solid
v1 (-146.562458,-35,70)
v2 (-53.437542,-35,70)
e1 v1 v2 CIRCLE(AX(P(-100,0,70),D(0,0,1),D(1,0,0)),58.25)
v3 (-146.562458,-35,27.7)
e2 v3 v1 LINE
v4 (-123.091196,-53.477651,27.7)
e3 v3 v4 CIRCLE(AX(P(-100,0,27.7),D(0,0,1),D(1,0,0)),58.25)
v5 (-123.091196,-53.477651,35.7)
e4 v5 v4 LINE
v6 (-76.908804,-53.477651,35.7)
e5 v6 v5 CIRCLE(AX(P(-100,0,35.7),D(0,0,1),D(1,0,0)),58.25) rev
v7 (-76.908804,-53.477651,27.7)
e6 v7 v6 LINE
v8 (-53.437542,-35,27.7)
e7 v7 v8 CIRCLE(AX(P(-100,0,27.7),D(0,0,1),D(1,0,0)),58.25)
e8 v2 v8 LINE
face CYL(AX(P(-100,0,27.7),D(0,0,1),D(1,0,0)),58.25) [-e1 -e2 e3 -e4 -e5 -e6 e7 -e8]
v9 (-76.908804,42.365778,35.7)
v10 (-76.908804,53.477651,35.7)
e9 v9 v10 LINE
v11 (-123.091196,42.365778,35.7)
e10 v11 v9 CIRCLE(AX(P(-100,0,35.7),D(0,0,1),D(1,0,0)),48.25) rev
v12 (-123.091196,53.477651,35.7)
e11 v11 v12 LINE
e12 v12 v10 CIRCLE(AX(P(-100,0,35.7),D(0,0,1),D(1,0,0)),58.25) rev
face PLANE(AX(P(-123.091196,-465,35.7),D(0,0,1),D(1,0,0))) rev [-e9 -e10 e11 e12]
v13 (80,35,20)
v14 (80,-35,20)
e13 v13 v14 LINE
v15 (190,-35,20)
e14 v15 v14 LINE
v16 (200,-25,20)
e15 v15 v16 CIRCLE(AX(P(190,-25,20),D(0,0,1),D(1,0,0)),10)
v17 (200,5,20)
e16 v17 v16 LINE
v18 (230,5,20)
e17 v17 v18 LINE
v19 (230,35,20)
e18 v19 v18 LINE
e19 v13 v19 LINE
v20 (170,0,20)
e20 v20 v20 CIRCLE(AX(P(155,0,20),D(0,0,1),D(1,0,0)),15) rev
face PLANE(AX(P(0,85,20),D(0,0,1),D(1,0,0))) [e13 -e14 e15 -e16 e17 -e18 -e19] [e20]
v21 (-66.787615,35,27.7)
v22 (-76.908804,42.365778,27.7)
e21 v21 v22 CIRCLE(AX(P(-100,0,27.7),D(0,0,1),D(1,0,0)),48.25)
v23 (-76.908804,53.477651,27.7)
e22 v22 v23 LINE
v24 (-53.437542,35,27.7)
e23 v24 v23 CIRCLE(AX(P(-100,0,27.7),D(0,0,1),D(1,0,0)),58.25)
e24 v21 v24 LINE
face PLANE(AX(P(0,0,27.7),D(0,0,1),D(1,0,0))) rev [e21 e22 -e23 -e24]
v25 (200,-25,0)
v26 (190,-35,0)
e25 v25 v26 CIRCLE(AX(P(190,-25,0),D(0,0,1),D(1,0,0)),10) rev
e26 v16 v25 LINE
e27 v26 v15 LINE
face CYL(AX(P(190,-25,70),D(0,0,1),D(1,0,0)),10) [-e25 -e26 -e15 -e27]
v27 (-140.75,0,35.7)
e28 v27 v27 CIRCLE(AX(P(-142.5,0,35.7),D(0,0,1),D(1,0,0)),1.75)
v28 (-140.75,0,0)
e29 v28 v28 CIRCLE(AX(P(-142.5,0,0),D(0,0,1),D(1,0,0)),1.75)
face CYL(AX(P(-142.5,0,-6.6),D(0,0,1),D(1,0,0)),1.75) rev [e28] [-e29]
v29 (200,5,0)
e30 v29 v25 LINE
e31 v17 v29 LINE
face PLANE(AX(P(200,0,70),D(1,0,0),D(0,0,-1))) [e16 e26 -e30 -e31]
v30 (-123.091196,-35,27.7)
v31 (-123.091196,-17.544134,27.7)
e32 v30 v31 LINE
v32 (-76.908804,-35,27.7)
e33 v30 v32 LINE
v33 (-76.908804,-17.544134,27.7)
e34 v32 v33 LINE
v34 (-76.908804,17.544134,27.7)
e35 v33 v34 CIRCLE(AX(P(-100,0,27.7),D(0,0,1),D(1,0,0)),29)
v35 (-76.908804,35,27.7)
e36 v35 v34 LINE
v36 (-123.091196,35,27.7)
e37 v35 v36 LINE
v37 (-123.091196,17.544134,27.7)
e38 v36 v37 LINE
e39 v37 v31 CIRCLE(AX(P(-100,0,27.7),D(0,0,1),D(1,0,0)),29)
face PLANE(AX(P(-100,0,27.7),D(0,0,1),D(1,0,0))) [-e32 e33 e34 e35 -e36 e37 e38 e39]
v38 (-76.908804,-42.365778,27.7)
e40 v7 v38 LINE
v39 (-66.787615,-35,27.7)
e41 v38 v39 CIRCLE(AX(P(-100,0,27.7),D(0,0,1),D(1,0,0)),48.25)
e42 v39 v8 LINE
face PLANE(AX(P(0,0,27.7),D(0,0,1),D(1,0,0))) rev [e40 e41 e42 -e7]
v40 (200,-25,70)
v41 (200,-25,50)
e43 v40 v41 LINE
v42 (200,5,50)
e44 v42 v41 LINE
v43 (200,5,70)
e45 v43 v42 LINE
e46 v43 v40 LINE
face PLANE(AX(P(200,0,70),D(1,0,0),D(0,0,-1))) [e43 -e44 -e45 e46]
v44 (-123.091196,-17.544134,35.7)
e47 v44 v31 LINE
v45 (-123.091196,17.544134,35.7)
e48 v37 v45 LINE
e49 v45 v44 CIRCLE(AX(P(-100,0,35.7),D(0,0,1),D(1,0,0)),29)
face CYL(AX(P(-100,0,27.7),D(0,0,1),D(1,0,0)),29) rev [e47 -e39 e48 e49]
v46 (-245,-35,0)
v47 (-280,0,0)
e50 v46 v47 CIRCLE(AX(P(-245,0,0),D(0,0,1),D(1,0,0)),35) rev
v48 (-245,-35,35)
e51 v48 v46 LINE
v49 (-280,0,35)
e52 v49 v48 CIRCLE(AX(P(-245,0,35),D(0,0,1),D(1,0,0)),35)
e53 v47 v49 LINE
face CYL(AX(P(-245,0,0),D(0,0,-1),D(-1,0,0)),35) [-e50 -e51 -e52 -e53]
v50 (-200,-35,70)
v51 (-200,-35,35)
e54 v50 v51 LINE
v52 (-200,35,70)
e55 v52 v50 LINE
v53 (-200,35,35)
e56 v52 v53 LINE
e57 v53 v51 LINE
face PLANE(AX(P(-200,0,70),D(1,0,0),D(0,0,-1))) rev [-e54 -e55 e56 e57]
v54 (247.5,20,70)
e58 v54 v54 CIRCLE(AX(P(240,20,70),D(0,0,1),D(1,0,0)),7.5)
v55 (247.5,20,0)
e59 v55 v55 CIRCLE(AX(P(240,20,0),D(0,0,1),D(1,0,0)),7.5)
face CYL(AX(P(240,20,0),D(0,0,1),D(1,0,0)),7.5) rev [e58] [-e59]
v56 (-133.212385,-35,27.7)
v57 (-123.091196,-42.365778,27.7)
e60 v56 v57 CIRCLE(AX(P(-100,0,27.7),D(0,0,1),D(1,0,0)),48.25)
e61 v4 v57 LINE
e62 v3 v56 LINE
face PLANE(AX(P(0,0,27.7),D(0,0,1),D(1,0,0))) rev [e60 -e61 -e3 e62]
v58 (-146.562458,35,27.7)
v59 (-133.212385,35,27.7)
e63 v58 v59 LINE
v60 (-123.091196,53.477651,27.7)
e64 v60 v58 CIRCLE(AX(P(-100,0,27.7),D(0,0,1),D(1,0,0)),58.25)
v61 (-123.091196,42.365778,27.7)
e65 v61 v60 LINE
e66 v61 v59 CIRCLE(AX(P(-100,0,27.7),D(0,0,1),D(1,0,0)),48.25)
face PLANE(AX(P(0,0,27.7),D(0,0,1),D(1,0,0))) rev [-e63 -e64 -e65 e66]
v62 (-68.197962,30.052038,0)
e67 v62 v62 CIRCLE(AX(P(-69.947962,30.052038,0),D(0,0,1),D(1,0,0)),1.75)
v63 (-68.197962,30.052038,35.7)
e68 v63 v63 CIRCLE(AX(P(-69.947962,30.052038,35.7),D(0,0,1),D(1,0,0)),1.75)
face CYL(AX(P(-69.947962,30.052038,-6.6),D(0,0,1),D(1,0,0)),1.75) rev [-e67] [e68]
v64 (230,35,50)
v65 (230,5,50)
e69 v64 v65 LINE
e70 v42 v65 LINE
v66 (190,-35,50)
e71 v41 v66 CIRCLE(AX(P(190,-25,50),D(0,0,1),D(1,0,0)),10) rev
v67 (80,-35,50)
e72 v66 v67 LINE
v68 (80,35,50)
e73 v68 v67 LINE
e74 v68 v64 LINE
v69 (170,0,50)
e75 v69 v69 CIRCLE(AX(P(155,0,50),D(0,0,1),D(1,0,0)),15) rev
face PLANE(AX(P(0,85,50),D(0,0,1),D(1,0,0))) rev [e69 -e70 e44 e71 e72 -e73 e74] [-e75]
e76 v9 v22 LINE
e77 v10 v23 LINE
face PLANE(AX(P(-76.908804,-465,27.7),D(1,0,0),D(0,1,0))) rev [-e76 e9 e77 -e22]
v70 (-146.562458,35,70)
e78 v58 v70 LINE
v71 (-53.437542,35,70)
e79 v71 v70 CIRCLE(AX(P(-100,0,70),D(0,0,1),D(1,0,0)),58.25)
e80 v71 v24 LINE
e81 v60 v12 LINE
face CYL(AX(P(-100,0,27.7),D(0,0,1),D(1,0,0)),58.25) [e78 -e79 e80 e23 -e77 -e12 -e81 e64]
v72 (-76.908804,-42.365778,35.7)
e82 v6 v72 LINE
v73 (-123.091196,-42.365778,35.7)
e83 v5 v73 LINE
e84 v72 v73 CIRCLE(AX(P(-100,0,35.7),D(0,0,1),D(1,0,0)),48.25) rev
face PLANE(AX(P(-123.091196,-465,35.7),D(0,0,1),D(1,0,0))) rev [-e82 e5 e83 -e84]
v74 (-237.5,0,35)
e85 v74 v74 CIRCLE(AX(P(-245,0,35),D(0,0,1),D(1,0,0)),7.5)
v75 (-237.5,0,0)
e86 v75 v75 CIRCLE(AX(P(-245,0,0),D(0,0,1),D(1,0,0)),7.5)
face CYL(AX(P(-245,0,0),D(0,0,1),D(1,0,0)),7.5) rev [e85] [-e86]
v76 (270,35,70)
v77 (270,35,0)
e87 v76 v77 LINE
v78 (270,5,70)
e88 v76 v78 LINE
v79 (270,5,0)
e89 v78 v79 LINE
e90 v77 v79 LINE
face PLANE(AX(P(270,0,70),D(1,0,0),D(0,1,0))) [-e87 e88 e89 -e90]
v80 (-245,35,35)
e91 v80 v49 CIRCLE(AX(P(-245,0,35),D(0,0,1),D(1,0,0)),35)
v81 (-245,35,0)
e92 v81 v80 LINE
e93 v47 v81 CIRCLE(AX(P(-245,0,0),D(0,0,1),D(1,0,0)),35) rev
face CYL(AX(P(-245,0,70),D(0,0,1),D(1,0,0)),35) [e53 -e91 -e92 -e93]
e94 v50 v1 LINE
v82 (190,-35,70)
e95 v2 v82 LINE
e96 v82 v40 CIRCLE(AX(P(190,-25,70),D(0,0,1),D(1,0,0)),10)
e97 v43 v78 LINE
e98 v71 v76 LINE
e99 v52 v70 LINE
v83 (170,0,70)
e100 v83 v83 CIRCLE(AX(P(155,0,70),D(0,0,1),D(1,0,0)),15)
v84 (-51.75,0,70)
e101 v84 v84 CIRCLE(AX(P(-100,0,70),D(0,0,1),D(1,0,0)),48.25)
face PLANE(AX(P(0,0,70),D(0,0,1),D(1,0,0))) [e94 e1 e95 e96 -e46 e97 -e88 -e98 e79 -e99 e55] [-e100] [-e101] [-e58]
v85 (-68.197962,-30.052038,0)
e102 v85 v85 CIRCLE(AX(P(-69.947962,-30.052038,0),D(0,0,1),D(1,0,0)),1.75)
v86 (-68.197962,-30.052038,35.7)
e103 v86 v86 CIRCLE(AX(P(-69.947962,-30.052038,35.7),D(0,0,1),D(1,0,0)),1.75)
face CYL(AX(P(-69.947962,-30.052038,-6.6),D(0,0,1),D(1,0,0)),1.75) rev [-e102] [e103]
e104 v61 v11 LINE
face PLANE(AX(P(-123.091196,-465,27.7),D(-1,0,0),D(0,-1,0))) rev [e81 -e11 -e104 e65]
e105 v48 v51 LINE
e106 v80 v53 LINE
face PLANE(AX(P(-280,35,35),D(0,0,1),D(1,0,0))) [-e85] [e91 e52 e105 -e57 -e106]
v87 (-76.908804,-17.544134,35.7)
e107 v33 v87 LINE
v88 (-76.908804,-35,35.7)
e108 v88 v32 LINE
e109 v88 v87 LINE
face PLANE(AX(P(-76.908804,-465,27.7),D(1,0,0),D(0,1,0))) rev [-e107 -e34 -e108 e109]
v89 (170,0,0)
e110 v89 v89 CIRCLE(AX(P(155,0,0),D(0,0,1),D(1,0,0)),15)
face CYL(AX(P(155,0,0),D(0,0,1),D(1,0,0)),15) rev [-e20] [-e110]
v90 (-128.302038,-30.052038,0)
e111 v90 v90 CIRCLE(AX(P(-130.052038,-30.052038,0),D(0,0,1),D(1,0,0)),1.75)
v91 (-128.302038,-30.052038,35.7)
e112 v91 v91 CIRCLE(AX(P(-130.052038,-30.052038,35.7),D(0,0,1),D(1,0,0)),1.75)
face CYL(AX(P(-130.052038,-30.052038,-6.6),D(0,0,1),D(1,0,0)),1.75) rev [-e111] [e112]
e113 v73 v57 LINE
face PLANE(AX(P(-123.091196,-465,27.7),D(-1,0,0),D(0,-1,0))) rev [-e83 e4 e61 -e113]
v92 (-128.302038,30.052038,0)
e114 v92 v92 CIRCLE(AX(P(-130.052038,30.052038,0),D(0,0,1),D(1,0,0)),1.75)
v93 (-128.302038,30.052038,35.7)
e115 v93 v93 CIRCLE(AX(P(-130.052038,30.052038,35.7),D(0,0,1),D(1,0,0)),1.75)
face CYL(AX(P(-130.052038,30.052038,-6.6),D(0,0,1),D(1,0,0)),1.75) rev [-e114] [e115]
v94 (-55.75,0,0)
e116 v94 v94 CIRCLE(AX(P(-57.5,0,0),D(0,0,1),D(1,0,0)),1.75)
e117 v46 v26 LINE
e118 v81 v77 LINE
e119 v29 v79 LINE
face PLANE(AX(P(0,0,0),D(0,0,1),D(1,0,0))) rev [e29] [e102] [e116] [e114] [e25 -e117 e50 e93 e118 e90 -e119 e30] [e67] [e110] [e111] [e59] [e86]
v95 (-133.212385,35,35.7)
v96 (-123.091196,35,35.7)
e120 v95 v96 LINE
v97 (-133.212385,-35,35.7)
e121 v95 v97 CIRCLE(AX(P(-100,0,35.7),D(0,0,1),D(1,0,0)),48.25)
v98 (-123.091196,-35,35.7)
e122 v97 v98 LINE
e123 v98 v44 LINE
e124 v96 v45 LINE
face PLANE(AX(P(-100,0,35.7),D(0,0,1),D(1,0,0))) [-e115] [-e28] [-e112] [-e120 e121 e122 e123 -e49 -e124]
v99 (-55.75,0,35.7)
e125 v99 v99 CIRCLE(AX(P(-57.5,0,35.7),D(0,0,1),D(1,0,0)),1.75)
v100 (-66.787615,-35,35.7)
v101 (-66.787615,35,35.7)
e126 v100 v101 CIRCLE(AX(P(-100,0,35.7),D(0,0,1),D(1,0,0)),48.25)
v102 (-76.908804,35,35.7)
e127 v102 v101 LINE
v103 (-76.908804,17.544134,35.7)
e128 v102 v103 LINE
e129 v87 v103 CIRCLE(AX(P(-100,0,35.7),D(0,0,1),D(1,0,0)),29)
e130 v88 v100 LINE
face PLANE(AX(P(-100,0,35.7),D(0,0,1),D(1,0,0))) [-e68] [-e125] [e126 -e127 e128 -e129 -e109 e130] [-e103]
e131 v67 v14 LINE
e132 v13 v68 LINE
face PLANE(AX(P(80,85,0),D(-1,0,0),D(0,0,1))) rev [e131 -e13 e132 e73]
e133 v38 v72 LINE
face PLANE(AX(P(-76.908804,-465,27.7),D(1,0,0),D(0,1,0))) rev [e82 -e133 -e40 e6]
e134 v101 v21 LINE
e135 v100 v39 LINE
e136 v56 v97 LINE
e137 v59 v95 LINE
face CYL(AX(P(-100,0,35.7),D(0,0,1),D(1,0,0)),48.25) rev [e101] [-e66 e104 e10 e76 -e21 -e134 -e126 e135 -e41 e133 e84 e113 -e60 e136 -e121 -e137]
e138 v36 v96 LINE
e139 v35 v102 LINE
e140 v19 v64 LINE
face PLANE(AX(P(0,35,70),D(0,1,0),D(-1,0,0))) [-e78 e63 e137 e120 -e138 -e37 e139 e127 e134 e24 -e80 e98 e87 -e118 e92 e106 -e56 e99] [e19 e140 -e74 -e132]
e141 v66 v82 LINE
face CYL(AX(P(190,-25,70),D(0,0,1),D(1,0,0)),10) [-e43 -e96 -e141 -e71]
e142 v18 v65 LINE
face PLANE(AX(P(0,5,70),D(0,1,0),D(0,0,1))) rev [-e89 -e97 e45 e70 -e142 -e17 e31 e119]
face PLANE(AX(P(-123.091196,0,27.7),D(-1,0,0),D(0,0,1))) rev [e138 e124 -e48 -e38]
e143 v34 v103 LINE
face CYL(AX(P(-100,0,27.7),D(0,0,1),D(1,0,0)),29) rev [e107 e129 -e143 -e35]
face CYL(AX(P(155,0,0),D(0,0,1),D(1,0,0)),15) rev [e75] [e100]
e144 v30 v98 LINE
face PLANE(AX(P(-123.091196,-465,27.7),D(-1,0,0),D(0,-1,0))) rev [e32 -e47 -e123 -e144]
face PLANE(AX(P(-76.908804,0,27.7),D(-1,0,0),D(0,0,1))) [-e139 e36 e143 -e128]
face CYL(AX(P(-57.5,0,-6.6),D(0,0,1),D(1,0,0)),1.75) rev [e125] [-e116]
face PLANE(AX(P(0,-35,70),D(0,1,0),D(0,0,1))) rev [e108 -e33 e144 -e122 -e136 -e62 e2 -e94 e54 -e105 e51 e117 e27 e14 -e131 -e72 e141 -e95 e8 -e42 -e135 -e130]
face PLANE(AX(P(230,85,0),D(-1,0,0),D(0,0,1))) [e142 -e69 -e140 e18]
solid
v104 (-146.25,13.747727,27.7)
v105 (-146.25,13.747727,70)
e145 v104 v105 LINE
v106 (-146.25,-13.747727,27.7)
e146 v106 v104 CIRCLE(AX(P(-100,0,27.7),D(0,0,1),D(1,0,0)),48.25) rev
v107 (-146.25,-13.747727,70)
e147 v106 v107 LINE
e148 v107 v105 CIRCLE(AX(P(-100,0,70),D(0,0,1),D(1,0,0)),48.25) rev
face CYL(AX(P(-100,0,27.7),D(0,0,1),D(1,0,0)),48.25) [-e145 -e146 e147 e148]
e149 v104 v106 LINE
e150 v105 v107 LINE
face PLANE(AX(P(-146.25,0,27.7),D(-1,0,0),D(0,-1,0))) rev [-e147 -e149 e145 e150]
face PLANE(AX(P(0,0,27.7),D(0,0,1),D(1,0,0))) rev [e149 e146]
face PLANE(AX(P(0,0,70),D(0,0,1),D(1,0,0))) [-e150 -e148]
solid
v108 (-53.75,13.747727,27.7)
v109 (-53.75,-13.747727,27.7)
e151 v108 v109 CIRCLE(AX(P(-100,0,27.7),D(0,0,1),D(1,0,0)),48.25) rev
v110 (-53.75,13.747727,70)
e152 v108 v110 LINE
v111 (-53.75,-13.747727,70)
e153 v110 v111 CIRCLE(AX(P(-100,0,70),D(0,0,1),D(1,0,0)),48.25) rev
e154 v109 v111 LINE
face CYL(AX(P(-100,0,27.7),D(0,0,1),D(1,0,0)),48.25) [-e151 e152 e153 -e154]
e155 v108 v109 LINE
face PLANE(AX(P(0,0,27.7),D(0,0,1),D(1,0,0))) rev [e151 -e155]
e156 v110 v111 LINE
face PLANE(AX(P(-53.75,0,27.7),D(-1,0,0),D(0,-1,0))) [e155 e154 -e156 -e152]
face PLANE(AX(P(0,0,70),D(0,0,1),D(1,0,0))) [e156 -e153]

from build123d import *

# Parameters (mm, degrees)
SKETCH_2_W           = 400
SKETCH_2_H           = 70
SKETCH_2_W_2         = 70
SKETCH_2_H_2         = 30
EXTRUDE_2_DEPTH      = 70
SKETCH_3_R           = 7.5
SKETCH_3_R_2         = 15
CUT_EXTRUDE_1_DEPTH  = 282.113855937
SKETCH_4_W           = 120
SKETCH_4_H           = 30
SKETCH_4_W_2         = 30
CUT_EXTRUDE_2_DEPTH  = 120
FILLET_1_R           = 10
SKETCH_5_R           = 48.25
CUT_EXTRUDE_3_DEPTH  = 34.3
EXTRUDE_3_DEPTH      = 42.3
EXTRUDE_4_DEPTH      = 42.3
EXTRUDE_4_2_DEPTH    = 42.3
SKETCH_8_R           = 1.75
CUT_EXTRUDE_4_DEPTH  = 42.3
SKETCH_11_R          = 29
CUT_EXTRUDE_6_DEPTH  = 8
CUT_EXTRUDE_7_DEPTH  = 8
SKETCH_13_W          = 35
SKETCH_13_H          = 70
EXTRUDE_5_DEPTH      = 80
FILLET_2_R           = 35
SKETCH_14_R          = 7.5
CUT_EXTRUDE_8_DEPTH  = 295.436856558
SKETCH_15_W          = 46.18239298
SKETCH_15_H          = 8
CUT_EXTRUDE_10_DEPTH = 500


with BuildPart() as part:
    # 草图2 → 凸台-拉伸2 (new body)
    with BuildSketch(Plane.XY):
        Rectangle(SKETCH_2_W, SKETCH_2_H)
        with Locations((235, 20)):
            Rectangle(SKETCH_2_W_2, SKETCH_2_H_2)
    extrude(amount=EXTRUDE_2_DEPTH)

    # 草图3 → 切除-拉伸1 (cut, through all)
    with BuildSketch(Plane.XY.offset(70)):
        with Locations((240, 20)):
            Circle(SKETCH_3_R)
        with Locations((155, 0)):
            Circle(SKETCH_3_R_2)
    extrude(amount=-CUT_EXTRUDE_1_DEPTH, mode=Mode.SUBTRACT)

    # 草图4 → 切除-拉伸2 (cut)
    with BuildSketch(Plane.XZ.offset(35)):
        with Locations((140, 35)):
            Rectangle(SKETCH_4_W, SKETCH_4_H)
        with Locations((215, 35)):
            Rectangle(SKETCH_4_W_2, SKETCH_4_H)
    extrude(amount=-CUT_EXTRUDE_2_DEPTH, mode=Mode.SUBTRACT)

    # 圆角1
    fillet_1_edges = [part.edges().sort_by_distance(p)[0] for p in [
        (200, -35, 60),
        (200, -35, 10),
    ]]
    fillet(fillet_1_edges, radius=FILLET_1_R)

    # 草图5 → 切除-拉伸3 (cut)
    with BuildSketch(Plane.XY.offset(70)):
        with Locations((-100, 0)):
            Circle(SKETCH_5_R)
    extrude(amount=-CUT_EXTRUDE_3_DEPTH, mode=Mode.SUBTRACT)

    # 草图6 → 凸台-拉伸3 (add)
    with BuildSketch(Plane.XY.offset(70)):
        with BuildLine():
            ThreePointArc((-51.75, 0), (-55.668520983, -19.046849298), (-66.787615262, -35))
            Line((-66.787615262, -35), (-53.437541946, -35))
            ThreePointArc((-53.437541946, -35), (-44.749091946, -18.449923013), (-41.75, 0))
            ThreePointArc((-41.75, 0), (-44.749091946, 18.449923013), (-53.437541946, 35))
            Line((-53.437541946, 35), (-66.787615262, 35))
            ThreePointArc((-66.787615262, 35), (-55.668520983, 19.046849298), (-51.75, 0))
        make_face()
        with BuildLine():
            Line((-53.437541946, -35), (-66.787615262, -35))
            ThreePointArc((-66.787615262, -35), (-148.25, 0), (-66.787615262, 35))
            Line((-66.787615262, 35), (-53.437541946, 35))
            ThreePointArc((-53.437541946, 35), (-158.25, 0), (-53.437541946, -35))
        make_face()
        with BuildLine():
            ThreePointArc((-51.75, 0), (-55.668520983, -19.046849298), (-66.787615262, -35))
            Line((-66.787615262, -35), (-53.437541946, -35))
            ThreePointArc((-53.437541946, -35), (-44.749091946, -18.449923013), (-41.75, 0))
            ThreePointArc((-41.75, 0), (-44.749091946, 18.449923013), (-53.437541946, 35))
            Line((-53.437541946, 35), (-66.787615262, 35))
            ThreePointArc((-66.787615262, 35), (-55.668520983, 19.046849298), (-51.75, 0))
        make_face()
    extrude(amount=-EXTRUDE_3_DEPTH)

    # 草图8 → 切除-拉伸4 (cut)
    with BuildSketch(Plane.XY.offset(35.7)):
        with Locations((-142.5, 0)):
            Circle(SKETCH_8_R)
        with Locations((-130.0520382, 30.0520382)):
            Circle(SKETCH_8_R)
        with Locations((-100, 42.5)):
            Circle(SKETCH_8_R)
        with Locations((-69.9479618, 30.0520382)):
            Circle(SKETCH_8_R)
        with Locations((-57.5, 0)):
            Circle(SKETCH_8_R)
        with Locations((-69.9479618, -30.0520382)):
            Circle(SKETCH_8_R)
        with Locations((-100, -42.5)):
            Circle(SKETCH_8_R)
        with Locations((-130.0520382, -30.0520382)):
            Circle(SKETCH_8_R)
    extrude(amount=-CUT_EXTRUDE_4_DEPTH, mode=Mode.SUBTRACT)

    # 草图11 → 切除-拉伸6 (cut)
    with BuildSketch(Plane.XY.offset(35.7)):
        with Locations((-100, 0)):
            Circle(SKETCH_11_R)
    extrude(amount=-CUT_EXTRUDE_6_DEPTH, mode=Mode.SUBTRACT)

    # 草图12 → 切除-拉伸7 (cut)
    with BuildSketch(Plane.XY.offset(35.7)):
        with BuildLine():
            Line((-100, 29), (-100, 35))
            Line((-100, 35), (-123.09119649, 35))
            Line((-123.09119649, 35), (-123.09119649, 17.544134195))
            ThreePointArc((-123.09119649, 17.544134195), (-112.888368949, 25.978644034), (-100, 29))
        make_face()
        with BuildLine():
            Line((-76.90880351, 17.544134195), (-76.90880351, 35))
            Line((-76.90880351, 35), (-100, 35))
            Line((-100, 35), (-100, 29))
            ThreePointArc((-100, 29), (-87.111631051, 25.978644034), (-76.90880351, 17.544134195))
        make_face()
        with BuildLine():
            ThreePointArc((-100, -29), (-107.281043458, -28.071095564), (-114.09564598, -25.34389008))
            Line((-114.09564598, -25.34389008), (-114.09564598, -35))
            Line((-114.09564598, -35), (-100, -35))
            Line((-100, -35), (-100, -29))
        make_face()
        with BuildLine():
            Line((-85.90435402, -35), (-85.90435402, -25.34389008))
            ThreePointArc((-85.90435402, -25.34389008), (-92.718956542, -28.071095564), (-100, -29))
            Line((-100, -29), (-100, -35))
            Line((-100, -35), (-85.90435402, -35))
        make_face()
    extrude(amount=-CUT_EXTRUDE_7_DEPTH, mode=Mode.SUBTRACT)

    # 草图13 → 凸台-拉伸5 (add)
    with BuildSketch(Plane.ZY.offset(200)):
        with Locations((17.5, 0)):
            Rectangle(SKETCH_13_W, SKETCH_13_H)
    extrude(amount=EXTRUDE_5_DEPTH)

    # 圆角2
    fillet_2_edges = [part.edges().sort_by_distance(p)[0] for p in [
        (-280, 35, 17.5),
        (-280, -35, 17.5),
    ]]
    fillet(fillet_2_edges, radius=FILLET_2_R - 0.0001)  # a hair under: the kernel refuses the full size

    # 草图14 → 切除-拉伸8 (cut, through all)
    with BuildSketch(Plane.XY.offset(70)):
        with Locations((-245, 0)):
            Circle(SKETCH_14_R)
    extrude(amount=-CUT_EXTRUDE_8_DEPTH, mode=Mode.SUBTRACT)

    # 草图15 → 切除-拉伸10 (cut, symmetric)
    with BuildSketch(Plane(origin=(0, 35, 0), x_dir=(1, 0, 0), z_dir=(0, 1, 0))):
        with Locations((-100, -31.7)):
            Rectangle(SKETCH_15_W, SKETCH_15_H)
    extrude(amount=CUT_EXTRUDE_10_DEPTH, both=True, mode=Mode.SUBTRACT)


with BuildPart() as body_2:
    # 草图7 → 凸台-拉伸4 (new body)
    with BuildSketch(Plane.XY.offset(70)):
        with BuildLine():
            Line((-146.25, -13.747727085), (-146.25, 13.747727085))
            ThreePointArc((-146.25, 13.747727085), (-148.25, 0), (-146.25, -13.747727085))
        make_face()
    extrude(amount=-EXTRUDE_4_DEPTH)


with BuildPart() as body_3:
    # 草图7 → Extrude 4 2 (new body)
    with BuildSketch(Plane.XY.offset(70)):
        with BuildLine():
            ThreePointArc((-51.75, 0), (-52.252617873, 6.946221995), (-53.75, 13.747727085))
            Line((-53.75, 13.747727085), (-53.75, -13.747727085))
            ThreePointArc((-53.75, -13.747727085), (-52.252617873, -6.946221995), (-51.75, 0))
        make_face()
    extrude(amount=-EXTRUDE_4_2_DEPTH)


solid = Compound([part.part, body_2.part, body_3.part])
